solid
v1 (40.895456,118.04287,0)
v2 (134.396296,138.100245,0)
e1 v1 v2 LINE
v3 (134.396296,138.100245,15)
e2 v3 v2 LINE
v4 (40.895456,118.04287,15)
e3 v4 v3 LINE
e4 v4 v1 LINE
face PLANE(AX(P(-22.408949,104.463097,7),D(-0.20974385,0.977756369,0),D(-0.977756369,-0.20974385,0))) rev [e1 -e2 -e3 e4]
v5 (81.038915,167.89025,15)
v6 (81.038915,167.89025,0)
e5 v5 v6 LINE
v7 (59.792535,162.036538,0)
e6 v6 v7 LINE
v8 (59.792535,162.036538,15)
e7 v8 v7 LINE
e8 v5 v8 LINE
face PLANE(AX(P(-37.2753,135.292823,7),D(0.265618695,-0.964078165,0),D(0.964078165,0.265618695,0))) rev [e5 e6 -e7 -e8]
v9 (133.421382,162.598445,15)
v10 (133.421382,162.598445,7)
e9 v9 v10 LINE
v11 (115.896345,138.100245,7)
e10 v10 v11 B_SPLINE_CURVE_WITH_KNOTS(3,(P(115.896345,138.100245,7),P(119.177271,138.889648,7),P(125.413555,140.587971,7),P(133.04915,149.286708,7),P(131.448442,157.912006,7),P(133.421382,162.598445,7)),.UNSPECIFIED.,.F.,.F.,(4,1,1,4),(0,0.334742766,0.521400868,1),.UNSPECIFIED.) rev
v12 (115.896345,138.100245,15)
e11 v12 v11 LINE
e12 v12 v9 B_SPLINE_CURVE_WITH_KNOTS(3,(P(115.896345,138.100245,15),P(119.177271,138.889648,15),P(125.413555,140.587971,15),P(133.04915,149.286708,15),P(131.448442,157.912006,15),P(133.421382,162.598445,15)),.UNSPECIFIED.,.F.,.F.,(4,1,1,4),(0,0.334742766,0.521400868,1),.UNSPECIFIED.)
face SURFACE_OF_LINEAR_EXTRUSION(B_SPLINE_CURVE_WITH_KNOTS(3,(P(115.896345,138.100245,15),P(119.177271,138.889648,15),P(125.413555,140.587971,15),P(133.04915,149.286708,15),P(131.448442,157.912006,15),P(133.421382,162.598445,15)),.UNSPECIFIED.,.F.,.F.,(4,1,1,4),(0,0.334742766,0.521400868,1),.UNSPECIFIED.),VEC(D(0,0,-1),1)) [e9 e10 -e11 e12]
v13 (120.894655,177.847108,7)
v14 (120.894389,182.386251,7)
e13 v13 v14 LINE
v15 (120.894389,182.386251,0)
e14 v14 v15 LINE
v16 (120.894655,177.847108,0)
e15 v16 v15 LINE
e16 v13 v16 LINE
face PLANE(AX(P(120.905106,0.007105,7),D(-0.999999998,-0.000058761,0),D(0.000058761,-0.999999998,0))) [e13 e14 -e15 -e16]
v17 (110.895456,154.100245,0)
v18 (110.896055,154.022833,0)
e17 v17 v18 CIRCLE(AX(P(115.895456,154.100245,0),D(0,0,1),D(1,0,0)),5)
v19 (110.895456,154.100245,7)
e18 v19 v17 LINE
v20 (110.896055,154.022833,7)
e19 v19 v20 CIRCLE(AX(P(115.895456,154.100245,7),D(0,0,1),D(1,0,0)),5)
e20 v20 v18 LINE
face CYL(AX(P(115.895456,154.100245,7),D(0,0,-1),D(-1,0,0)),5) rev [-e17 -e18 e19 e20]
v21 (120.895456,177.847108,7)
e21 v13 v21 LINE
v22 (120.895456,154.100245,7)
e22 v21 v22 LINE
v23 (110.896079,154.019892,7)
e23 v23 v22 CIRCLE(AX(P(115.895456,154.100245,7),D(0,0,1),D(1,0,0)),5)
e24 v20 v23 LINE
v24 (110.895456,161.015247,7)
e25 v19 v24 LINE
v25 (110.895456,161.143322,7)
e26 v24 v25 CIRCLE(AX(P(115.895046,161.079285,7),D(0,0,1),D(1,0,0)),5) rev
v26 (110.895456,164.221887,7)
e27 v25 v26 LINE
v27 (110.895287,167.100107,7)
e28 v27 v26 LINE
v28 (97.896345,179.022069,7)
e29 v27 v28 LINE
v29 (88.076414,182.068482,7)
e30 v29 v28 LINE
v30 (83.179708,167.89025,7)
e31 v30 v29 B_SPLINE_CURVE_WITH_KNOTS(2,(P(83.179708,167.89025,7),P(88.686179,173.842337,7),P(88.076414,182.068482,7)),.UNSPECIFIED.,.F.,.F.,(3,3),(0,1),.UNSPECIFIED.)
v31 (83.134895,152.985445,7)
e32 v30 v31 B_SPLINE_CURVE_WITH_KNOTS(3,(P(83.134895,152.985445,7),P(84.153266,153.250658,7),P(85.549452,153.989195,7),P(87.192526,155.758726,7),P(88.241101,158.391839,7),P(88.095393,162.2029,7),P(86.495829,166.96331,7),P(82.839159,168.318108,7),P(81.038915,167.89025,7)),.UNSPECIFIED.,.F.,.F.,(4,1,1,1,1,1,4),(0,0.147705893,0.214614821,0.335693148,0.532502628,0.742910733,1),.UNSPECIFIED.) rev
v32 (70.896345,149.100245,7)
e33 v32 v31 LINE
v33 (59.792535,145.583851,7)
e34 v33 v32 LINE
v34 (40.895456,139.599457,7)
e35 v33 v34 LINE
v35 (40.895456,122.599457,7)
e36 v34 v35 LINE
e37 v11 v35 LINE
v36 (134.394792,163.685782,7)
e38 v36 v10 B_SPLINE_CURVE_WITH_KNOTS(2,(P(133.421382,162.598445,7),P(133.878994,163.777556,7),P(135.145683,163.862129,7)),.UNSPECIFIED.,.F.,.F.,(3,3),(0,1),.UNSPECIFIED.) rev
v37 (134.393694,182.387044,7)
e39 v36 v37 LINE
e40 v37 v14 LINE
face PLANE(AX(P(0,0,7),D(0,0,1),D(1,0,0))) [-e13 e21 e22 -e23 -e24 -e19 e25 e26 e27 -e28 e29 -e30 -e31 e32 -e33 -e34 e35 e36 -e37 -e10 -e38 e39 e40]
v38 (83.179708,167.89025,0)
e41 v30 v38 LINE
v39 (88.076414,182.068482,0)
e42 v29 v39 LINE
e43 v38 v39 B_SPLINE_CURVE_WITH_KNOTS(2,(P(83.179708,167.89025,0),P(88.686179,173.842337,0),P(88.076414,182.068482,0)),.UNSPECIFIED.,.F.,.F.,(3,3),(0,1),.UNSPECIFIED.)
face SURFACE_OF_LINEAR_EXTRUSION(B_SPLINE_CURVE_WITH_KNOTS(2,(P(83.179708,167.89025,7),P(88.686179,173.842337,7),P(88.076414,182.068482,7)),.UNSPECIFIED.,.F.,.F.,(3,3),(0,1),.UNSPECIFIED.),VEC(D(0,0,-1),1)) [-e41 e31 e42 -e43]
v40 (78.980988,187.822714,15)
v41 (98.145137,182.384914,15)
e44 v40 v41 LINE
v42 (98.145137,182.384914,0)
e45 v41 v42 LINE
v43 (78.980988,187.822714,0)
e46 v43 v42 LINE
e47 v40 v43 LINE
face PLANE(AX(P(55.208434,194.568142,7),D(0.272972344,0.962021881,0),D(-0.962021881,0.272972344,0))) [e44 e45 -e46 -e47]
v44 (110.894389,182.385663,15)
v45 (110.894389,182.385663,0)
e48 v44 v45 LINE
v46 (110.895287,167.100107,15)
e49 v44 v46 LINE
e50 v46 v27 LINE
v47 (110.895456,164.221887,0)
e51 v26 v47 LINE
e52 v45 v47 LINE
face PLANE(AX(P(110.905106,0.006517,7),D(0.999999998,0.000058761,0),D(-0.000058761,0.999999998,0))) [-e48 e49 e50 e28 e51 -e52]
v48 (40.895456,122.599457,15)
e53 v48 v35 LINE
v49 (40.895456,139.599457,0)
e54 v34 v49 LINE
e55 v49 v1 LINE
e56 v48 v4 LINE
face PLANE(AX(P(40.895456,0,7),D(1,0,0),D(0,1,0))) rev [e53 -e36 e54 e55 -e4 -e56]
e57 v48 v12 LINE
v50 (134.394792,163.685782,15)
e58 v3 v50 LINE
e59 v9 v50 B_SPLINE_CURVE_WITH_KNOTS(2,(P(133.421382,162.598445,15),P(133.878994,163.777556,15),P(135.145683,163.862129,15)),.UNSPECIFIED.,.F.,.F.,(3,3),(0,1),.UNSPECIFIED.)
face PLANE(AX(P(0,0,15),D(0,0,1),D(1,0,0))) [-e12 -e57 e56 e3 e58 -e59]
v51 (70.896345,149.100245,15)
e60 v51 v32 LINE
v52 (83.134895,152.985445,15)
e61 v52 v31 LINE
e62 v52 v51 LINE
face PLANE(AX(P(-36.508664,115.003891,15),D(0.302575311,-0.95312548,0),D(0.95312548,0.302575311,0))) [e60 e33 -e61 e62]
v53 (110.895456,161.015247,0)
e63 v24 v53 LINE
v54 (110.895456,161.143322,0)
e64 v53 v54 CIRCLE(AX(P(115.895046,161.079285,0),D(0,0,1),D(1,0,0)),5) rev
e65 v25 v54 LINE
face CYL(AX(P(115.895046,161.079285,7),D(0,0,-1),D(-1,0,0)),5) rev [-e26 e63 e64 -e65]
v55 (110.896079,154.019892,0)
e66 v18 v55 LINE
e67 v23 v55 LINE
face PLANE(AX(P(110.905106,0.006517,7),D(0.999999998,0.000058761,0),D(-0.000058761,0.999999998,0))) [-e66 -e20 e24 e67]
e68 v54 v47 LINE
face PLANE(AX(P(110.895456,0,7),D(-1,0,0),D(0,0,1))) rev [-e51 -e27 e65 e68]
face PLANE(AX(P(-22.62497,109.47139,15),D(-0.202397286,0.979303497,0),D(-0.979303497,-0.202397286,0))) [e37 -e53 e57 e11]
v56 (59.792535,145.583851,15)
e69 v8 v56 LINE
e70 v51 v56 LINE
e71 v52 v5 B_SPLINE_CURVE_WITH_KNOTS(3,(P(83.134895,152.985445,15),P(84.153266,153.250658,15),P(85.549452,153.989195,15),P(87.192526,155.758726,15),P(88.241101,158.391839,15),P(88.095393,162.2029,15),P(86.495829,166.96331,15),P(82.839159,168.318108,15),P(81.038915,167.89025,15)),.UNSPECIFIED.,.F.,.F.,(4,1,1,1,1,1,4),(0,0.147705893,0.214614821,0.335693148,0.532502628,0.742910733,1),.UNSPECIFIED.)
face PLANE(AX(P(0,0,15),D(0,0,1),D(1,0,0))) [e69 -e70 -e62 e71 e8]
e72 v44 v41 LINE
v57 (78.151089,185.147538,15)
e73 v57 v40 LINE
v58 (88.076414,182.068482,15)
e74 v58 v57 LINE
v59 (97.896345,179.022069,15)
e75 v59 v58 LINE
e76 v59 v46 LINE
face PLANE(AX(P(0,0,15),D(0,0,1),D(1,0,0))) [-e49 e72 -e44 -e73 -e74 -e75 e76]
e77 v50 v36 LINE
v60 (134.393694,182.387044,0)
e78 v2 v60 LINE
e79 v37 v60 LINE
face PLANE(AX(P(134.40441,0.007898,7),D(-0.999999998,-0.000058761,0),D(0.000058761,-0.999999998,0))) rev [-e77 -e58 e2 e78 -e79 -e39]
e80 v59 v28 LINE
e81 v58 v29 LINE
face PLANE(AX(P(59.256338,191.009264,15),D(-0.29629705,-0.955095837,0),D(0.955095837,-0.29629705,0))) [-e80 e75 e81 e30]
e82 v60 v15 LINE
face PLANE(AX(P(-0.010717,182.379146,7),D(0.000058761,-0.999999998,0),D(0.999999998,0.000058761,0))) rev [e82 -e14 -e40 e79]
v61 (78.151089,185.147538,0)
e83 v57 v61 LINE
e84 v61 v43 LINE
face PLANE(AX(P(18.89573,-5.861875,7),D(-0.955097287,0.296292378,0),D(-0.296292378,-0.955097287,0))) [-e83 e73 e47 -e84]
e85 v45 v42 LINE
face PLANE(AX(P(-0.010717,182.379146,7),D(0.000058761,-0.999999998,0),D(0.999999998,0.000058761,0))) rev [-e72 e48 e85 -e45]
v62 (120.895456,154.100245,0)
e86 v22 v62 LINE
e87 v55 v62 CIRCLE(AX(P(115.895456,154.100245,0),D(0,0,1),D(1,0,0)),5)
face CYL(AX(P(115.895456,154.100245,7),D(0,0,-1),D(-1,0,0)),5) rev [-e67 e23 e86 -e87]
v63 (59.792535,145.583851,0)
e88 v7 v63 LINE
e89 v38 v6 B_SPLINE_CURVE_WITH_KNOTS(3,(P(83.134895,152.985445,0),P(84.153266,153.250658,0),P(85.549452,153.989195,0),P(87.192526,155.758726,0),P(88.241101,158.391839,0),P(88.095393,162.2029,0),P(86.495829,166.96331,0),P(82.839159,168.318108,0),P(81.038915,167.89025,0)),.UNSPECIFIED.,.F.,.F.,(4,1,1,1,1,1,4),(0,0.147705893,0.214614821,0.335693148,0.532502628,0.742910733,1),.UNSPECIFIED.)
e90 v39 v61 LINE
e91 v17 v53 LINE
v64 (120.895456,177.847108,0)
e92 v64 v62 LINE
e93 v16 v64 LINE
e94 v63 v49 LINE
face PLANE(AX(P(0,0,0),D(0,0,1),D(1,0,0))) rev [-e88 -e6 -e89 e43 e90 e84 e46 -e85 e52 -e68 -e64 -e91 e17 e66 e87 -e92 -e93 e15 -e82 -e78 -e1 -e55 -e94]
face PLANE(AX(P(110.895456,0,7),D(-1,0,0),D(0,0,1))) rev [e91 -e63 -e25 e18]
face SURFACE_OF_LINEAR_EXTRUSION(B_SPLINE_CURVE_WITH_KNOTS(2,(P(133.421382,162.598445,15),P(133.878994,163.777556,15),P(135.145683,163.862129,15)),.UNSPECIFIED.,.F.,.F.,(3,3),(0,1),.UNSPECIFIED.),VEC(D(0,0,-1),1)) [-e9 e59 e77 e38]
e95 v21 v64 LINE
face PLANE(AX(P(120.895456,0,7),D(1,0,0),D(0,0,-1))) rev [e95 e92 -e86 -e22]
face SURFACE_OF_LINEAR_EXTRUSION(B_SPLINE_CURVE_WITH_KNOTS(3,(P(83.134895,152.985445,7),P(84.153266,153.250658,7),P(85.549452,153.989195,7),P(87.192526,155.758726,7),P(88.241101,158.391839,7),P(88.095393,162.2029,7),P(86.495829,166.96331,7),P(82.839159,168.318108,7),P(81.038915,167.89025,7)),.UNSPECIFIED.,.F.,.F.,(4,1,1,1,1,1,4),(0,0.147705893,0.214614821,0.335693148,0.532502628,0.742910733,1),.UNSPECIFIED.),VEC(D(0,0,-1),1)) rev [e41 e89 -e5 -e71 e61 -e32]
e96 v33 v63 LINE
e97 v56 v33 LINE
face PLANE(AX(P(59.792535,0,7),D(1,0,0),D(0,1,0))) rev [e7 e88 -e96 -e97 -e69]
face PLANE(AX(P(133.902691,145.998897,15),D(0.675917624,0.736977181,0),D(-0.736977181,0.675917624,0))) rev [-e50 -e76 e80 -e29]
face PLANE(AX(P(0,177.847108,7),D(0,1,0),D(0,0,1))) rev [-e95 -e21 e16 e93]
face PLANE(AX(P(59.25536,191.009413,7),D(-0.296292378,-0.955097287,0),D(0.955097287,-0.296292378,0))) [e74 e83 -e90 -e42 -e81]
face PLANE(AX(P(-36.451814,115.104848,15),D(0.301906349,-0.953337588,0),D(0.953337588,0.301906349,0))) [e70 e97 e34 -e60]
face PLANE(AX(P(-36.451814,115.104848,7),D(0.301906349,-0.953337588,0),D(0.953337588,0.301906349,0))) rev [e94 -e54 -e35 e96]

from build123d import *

# Parameters (mm, degrees)
BOSS_EXTRUDE1_DEPTH = 7
BOSS_EXTRUDE3_DEPTH = 15


# Read off the part's stored shape, not the designer's step: Boss-Extrude1
with BuildPart() as part:
    # Boss-Extrude1 outline → Boss-Extrude1 (new body)
    with BuildSketch(Plane.XY):
        with BuildLine():
            add(Edge.make_bspline(
                [(83.179707937, 167.890249892), (88.68617922, 173.842337038), (88.076413708, 182.068482243)],
                knots=[0, 0, 0, 1, 1, 1], degree=2))
            add(Edge.make_bspline(
                [(83.179707937, 167.890249892), (82.472579462, 168.045621317), (81.739782997, 168.056822807), (81.038915385, 167.890249892)],
                knots=[0.899910496, 0.899910496, 0.899910496, 0.899910496, 1, 1, 1, 1], degree=3))
            Line((81.038915385, 167.890249892), (59.792534645, 162.03653789))
            Line((59.792534645, 162.03653789), (59.792534645, 145.583851284))
            Line((59.792534645, 145.583851284), (40.895456025, 139.599456998))
            Line((40.895456025, 139.599456998), (40.895456025, 118.042870489))
            Line((40.895456025, 118.042870489), (134.396295865, 138.100245442))
            Line((134.396295865, 138.100245442), (134.393693517, 182.387043765))
            Line((134.393693517, 182.387043765), (120.894388682, 182.386250529))
            Line((120.894388682, 182.386250529), (120.894655408, 177.847108131))
            Line((120.894655408, 177.847108131), (120.895456025, 177.847108131))
            Line((120.895456025, 177.847108131), (120.895456025, 154.100245399))
            ThreePointArc((120.895456025, 154.100245399), (115.9356337, 149.100406826), (110.896101724, 154.019892645))
            Line((110.896101724, 154.019892645), (110.896055334, 154.022832661))
            ThreePointArc((110.896055334, 154.022832661), (110.895605855, 154.06153787), (110.895456025, 154.100245399))
            Line((110.895456025, 154.100245399), (110.895456025, 161.015247015))
            ThreePointArc((110.895456025, 161.015247015), (110.895045928, 161.07928452), (110.895456025, 161.143322025))
            Line((110.895456025, 161.143322025), (110.895456025, 164.221886849))
            Line((110.895456025, 164.221886849), (110.894388699, 182.385662916))
            Line((110.894388699, 182.385662916), (98.145136748, 182.384913754))
            Line((98.145136748, 182.384913754), (78.980988049, 187.822713754))
            Line((78.980988049, 187.822713754), (78.151089215, 185.147538204))
            Line((78.151089215, 185.147538204), (88.076413708, 182.068482243))
        make_face()
    extrude(amount=BOSS_EXTRUDE1_DEPTH)

    # Sketch2<5> → Boss-Extrude3 (add)
    with BuildSketch(Plane.XY):
        Polygon((87.058497999, 182.38426229), (98.145136748, 182.384913754), (78.980988049, 187.822713754), (78.151089215, 185.147538204), align=None)
        Polygon((97.8963446, 179.022069051), (110.895286898, 167.10010673), (110.895184282, 168.846419808), (110.894388699, 182.385662916), (98.145136748, 182.384913754), (87.058497999, 182.38426229), (88.076413708, 182.068482243), align=None)
        with BuildLine():
            add(Edge.make_bspline(
                [(83.134894854, 152.985445474), (84.153265888, 153.250657791), (85.549452344, 153.989195137), (87.192525807, 155.758725734), (88.24110083, 158.391839128), (88.095392567, 162.20289978), (86.73683171, 166.246070864), (84.288905188, 167.646535258), (83.179707937, 167.890249892)],
                knots=[0, 0, 0, 0, 0.147705893, 0.214614821, 0.335693148, 0.532502628, 0.742910733, 0.899910496, 0.899910496, 0.899910496, 0.899910496], degree=3))
            add(Edge.make_bspline(
                [(83.179707937, 167.890249892), (82.472579462, 168.045621317), (81.739782997, 168.056822807), (81.038915385, 167.890249892)],
                knots=[0.899910496, 0.899910496, 0.899910496, 0.899910496, 1, 1, 1, 1], degree=3))
            Line((81.038915385, 167.890249892), (59.792534645, 162.03653789))
            Line((59.792534645, 162.03653789), (59.792534645, 145.583851284))
            Line((59.792534645, 145.583851284), (70.8963446, 149.100245442))
            Line((70.8963446, 149.100245442), (83.134894854, 152.985445474))
        make_face()
        with BuildLine():
            Line((134.396295865, 138.100245442), (134.394792427, 163.685781747))
            add(Edge.make_bspline(
                [(133.42138155, 162.598444875), (133.72729857, 163.386688135), (134.394792427, 163.685781747)],
                knots=[0, 0, 0, 0.668506509, 0.668506509, 0.668506509], degree=2))
            add(Edge.make_bspline(
                [(115.8963446, 138.100245442), (119.177270844, 138.889647711), (125.41355503, 140.587971019), (133.049150273, 149.2867081), (131.448441996, 157.912006128), (133.42138155, 162.598444875)],
                knots=[0, 0, 0, 0, 0.334742766, 0.521400868, 1, 1, 1, 1], degree=3))
            Line((115.8963446, 138.100245442), (40.895456025, 122.599456998))
            Line((40.895456025, 122.599456998), (40.895456025, 118.042870489))
            Line((40.895456025, 118.042870489), (134.396295865, 138.100245442))
        make_face()
    extrude(amount=BOSS_EXTRUDE3_DEPTH)


solid = part.part
